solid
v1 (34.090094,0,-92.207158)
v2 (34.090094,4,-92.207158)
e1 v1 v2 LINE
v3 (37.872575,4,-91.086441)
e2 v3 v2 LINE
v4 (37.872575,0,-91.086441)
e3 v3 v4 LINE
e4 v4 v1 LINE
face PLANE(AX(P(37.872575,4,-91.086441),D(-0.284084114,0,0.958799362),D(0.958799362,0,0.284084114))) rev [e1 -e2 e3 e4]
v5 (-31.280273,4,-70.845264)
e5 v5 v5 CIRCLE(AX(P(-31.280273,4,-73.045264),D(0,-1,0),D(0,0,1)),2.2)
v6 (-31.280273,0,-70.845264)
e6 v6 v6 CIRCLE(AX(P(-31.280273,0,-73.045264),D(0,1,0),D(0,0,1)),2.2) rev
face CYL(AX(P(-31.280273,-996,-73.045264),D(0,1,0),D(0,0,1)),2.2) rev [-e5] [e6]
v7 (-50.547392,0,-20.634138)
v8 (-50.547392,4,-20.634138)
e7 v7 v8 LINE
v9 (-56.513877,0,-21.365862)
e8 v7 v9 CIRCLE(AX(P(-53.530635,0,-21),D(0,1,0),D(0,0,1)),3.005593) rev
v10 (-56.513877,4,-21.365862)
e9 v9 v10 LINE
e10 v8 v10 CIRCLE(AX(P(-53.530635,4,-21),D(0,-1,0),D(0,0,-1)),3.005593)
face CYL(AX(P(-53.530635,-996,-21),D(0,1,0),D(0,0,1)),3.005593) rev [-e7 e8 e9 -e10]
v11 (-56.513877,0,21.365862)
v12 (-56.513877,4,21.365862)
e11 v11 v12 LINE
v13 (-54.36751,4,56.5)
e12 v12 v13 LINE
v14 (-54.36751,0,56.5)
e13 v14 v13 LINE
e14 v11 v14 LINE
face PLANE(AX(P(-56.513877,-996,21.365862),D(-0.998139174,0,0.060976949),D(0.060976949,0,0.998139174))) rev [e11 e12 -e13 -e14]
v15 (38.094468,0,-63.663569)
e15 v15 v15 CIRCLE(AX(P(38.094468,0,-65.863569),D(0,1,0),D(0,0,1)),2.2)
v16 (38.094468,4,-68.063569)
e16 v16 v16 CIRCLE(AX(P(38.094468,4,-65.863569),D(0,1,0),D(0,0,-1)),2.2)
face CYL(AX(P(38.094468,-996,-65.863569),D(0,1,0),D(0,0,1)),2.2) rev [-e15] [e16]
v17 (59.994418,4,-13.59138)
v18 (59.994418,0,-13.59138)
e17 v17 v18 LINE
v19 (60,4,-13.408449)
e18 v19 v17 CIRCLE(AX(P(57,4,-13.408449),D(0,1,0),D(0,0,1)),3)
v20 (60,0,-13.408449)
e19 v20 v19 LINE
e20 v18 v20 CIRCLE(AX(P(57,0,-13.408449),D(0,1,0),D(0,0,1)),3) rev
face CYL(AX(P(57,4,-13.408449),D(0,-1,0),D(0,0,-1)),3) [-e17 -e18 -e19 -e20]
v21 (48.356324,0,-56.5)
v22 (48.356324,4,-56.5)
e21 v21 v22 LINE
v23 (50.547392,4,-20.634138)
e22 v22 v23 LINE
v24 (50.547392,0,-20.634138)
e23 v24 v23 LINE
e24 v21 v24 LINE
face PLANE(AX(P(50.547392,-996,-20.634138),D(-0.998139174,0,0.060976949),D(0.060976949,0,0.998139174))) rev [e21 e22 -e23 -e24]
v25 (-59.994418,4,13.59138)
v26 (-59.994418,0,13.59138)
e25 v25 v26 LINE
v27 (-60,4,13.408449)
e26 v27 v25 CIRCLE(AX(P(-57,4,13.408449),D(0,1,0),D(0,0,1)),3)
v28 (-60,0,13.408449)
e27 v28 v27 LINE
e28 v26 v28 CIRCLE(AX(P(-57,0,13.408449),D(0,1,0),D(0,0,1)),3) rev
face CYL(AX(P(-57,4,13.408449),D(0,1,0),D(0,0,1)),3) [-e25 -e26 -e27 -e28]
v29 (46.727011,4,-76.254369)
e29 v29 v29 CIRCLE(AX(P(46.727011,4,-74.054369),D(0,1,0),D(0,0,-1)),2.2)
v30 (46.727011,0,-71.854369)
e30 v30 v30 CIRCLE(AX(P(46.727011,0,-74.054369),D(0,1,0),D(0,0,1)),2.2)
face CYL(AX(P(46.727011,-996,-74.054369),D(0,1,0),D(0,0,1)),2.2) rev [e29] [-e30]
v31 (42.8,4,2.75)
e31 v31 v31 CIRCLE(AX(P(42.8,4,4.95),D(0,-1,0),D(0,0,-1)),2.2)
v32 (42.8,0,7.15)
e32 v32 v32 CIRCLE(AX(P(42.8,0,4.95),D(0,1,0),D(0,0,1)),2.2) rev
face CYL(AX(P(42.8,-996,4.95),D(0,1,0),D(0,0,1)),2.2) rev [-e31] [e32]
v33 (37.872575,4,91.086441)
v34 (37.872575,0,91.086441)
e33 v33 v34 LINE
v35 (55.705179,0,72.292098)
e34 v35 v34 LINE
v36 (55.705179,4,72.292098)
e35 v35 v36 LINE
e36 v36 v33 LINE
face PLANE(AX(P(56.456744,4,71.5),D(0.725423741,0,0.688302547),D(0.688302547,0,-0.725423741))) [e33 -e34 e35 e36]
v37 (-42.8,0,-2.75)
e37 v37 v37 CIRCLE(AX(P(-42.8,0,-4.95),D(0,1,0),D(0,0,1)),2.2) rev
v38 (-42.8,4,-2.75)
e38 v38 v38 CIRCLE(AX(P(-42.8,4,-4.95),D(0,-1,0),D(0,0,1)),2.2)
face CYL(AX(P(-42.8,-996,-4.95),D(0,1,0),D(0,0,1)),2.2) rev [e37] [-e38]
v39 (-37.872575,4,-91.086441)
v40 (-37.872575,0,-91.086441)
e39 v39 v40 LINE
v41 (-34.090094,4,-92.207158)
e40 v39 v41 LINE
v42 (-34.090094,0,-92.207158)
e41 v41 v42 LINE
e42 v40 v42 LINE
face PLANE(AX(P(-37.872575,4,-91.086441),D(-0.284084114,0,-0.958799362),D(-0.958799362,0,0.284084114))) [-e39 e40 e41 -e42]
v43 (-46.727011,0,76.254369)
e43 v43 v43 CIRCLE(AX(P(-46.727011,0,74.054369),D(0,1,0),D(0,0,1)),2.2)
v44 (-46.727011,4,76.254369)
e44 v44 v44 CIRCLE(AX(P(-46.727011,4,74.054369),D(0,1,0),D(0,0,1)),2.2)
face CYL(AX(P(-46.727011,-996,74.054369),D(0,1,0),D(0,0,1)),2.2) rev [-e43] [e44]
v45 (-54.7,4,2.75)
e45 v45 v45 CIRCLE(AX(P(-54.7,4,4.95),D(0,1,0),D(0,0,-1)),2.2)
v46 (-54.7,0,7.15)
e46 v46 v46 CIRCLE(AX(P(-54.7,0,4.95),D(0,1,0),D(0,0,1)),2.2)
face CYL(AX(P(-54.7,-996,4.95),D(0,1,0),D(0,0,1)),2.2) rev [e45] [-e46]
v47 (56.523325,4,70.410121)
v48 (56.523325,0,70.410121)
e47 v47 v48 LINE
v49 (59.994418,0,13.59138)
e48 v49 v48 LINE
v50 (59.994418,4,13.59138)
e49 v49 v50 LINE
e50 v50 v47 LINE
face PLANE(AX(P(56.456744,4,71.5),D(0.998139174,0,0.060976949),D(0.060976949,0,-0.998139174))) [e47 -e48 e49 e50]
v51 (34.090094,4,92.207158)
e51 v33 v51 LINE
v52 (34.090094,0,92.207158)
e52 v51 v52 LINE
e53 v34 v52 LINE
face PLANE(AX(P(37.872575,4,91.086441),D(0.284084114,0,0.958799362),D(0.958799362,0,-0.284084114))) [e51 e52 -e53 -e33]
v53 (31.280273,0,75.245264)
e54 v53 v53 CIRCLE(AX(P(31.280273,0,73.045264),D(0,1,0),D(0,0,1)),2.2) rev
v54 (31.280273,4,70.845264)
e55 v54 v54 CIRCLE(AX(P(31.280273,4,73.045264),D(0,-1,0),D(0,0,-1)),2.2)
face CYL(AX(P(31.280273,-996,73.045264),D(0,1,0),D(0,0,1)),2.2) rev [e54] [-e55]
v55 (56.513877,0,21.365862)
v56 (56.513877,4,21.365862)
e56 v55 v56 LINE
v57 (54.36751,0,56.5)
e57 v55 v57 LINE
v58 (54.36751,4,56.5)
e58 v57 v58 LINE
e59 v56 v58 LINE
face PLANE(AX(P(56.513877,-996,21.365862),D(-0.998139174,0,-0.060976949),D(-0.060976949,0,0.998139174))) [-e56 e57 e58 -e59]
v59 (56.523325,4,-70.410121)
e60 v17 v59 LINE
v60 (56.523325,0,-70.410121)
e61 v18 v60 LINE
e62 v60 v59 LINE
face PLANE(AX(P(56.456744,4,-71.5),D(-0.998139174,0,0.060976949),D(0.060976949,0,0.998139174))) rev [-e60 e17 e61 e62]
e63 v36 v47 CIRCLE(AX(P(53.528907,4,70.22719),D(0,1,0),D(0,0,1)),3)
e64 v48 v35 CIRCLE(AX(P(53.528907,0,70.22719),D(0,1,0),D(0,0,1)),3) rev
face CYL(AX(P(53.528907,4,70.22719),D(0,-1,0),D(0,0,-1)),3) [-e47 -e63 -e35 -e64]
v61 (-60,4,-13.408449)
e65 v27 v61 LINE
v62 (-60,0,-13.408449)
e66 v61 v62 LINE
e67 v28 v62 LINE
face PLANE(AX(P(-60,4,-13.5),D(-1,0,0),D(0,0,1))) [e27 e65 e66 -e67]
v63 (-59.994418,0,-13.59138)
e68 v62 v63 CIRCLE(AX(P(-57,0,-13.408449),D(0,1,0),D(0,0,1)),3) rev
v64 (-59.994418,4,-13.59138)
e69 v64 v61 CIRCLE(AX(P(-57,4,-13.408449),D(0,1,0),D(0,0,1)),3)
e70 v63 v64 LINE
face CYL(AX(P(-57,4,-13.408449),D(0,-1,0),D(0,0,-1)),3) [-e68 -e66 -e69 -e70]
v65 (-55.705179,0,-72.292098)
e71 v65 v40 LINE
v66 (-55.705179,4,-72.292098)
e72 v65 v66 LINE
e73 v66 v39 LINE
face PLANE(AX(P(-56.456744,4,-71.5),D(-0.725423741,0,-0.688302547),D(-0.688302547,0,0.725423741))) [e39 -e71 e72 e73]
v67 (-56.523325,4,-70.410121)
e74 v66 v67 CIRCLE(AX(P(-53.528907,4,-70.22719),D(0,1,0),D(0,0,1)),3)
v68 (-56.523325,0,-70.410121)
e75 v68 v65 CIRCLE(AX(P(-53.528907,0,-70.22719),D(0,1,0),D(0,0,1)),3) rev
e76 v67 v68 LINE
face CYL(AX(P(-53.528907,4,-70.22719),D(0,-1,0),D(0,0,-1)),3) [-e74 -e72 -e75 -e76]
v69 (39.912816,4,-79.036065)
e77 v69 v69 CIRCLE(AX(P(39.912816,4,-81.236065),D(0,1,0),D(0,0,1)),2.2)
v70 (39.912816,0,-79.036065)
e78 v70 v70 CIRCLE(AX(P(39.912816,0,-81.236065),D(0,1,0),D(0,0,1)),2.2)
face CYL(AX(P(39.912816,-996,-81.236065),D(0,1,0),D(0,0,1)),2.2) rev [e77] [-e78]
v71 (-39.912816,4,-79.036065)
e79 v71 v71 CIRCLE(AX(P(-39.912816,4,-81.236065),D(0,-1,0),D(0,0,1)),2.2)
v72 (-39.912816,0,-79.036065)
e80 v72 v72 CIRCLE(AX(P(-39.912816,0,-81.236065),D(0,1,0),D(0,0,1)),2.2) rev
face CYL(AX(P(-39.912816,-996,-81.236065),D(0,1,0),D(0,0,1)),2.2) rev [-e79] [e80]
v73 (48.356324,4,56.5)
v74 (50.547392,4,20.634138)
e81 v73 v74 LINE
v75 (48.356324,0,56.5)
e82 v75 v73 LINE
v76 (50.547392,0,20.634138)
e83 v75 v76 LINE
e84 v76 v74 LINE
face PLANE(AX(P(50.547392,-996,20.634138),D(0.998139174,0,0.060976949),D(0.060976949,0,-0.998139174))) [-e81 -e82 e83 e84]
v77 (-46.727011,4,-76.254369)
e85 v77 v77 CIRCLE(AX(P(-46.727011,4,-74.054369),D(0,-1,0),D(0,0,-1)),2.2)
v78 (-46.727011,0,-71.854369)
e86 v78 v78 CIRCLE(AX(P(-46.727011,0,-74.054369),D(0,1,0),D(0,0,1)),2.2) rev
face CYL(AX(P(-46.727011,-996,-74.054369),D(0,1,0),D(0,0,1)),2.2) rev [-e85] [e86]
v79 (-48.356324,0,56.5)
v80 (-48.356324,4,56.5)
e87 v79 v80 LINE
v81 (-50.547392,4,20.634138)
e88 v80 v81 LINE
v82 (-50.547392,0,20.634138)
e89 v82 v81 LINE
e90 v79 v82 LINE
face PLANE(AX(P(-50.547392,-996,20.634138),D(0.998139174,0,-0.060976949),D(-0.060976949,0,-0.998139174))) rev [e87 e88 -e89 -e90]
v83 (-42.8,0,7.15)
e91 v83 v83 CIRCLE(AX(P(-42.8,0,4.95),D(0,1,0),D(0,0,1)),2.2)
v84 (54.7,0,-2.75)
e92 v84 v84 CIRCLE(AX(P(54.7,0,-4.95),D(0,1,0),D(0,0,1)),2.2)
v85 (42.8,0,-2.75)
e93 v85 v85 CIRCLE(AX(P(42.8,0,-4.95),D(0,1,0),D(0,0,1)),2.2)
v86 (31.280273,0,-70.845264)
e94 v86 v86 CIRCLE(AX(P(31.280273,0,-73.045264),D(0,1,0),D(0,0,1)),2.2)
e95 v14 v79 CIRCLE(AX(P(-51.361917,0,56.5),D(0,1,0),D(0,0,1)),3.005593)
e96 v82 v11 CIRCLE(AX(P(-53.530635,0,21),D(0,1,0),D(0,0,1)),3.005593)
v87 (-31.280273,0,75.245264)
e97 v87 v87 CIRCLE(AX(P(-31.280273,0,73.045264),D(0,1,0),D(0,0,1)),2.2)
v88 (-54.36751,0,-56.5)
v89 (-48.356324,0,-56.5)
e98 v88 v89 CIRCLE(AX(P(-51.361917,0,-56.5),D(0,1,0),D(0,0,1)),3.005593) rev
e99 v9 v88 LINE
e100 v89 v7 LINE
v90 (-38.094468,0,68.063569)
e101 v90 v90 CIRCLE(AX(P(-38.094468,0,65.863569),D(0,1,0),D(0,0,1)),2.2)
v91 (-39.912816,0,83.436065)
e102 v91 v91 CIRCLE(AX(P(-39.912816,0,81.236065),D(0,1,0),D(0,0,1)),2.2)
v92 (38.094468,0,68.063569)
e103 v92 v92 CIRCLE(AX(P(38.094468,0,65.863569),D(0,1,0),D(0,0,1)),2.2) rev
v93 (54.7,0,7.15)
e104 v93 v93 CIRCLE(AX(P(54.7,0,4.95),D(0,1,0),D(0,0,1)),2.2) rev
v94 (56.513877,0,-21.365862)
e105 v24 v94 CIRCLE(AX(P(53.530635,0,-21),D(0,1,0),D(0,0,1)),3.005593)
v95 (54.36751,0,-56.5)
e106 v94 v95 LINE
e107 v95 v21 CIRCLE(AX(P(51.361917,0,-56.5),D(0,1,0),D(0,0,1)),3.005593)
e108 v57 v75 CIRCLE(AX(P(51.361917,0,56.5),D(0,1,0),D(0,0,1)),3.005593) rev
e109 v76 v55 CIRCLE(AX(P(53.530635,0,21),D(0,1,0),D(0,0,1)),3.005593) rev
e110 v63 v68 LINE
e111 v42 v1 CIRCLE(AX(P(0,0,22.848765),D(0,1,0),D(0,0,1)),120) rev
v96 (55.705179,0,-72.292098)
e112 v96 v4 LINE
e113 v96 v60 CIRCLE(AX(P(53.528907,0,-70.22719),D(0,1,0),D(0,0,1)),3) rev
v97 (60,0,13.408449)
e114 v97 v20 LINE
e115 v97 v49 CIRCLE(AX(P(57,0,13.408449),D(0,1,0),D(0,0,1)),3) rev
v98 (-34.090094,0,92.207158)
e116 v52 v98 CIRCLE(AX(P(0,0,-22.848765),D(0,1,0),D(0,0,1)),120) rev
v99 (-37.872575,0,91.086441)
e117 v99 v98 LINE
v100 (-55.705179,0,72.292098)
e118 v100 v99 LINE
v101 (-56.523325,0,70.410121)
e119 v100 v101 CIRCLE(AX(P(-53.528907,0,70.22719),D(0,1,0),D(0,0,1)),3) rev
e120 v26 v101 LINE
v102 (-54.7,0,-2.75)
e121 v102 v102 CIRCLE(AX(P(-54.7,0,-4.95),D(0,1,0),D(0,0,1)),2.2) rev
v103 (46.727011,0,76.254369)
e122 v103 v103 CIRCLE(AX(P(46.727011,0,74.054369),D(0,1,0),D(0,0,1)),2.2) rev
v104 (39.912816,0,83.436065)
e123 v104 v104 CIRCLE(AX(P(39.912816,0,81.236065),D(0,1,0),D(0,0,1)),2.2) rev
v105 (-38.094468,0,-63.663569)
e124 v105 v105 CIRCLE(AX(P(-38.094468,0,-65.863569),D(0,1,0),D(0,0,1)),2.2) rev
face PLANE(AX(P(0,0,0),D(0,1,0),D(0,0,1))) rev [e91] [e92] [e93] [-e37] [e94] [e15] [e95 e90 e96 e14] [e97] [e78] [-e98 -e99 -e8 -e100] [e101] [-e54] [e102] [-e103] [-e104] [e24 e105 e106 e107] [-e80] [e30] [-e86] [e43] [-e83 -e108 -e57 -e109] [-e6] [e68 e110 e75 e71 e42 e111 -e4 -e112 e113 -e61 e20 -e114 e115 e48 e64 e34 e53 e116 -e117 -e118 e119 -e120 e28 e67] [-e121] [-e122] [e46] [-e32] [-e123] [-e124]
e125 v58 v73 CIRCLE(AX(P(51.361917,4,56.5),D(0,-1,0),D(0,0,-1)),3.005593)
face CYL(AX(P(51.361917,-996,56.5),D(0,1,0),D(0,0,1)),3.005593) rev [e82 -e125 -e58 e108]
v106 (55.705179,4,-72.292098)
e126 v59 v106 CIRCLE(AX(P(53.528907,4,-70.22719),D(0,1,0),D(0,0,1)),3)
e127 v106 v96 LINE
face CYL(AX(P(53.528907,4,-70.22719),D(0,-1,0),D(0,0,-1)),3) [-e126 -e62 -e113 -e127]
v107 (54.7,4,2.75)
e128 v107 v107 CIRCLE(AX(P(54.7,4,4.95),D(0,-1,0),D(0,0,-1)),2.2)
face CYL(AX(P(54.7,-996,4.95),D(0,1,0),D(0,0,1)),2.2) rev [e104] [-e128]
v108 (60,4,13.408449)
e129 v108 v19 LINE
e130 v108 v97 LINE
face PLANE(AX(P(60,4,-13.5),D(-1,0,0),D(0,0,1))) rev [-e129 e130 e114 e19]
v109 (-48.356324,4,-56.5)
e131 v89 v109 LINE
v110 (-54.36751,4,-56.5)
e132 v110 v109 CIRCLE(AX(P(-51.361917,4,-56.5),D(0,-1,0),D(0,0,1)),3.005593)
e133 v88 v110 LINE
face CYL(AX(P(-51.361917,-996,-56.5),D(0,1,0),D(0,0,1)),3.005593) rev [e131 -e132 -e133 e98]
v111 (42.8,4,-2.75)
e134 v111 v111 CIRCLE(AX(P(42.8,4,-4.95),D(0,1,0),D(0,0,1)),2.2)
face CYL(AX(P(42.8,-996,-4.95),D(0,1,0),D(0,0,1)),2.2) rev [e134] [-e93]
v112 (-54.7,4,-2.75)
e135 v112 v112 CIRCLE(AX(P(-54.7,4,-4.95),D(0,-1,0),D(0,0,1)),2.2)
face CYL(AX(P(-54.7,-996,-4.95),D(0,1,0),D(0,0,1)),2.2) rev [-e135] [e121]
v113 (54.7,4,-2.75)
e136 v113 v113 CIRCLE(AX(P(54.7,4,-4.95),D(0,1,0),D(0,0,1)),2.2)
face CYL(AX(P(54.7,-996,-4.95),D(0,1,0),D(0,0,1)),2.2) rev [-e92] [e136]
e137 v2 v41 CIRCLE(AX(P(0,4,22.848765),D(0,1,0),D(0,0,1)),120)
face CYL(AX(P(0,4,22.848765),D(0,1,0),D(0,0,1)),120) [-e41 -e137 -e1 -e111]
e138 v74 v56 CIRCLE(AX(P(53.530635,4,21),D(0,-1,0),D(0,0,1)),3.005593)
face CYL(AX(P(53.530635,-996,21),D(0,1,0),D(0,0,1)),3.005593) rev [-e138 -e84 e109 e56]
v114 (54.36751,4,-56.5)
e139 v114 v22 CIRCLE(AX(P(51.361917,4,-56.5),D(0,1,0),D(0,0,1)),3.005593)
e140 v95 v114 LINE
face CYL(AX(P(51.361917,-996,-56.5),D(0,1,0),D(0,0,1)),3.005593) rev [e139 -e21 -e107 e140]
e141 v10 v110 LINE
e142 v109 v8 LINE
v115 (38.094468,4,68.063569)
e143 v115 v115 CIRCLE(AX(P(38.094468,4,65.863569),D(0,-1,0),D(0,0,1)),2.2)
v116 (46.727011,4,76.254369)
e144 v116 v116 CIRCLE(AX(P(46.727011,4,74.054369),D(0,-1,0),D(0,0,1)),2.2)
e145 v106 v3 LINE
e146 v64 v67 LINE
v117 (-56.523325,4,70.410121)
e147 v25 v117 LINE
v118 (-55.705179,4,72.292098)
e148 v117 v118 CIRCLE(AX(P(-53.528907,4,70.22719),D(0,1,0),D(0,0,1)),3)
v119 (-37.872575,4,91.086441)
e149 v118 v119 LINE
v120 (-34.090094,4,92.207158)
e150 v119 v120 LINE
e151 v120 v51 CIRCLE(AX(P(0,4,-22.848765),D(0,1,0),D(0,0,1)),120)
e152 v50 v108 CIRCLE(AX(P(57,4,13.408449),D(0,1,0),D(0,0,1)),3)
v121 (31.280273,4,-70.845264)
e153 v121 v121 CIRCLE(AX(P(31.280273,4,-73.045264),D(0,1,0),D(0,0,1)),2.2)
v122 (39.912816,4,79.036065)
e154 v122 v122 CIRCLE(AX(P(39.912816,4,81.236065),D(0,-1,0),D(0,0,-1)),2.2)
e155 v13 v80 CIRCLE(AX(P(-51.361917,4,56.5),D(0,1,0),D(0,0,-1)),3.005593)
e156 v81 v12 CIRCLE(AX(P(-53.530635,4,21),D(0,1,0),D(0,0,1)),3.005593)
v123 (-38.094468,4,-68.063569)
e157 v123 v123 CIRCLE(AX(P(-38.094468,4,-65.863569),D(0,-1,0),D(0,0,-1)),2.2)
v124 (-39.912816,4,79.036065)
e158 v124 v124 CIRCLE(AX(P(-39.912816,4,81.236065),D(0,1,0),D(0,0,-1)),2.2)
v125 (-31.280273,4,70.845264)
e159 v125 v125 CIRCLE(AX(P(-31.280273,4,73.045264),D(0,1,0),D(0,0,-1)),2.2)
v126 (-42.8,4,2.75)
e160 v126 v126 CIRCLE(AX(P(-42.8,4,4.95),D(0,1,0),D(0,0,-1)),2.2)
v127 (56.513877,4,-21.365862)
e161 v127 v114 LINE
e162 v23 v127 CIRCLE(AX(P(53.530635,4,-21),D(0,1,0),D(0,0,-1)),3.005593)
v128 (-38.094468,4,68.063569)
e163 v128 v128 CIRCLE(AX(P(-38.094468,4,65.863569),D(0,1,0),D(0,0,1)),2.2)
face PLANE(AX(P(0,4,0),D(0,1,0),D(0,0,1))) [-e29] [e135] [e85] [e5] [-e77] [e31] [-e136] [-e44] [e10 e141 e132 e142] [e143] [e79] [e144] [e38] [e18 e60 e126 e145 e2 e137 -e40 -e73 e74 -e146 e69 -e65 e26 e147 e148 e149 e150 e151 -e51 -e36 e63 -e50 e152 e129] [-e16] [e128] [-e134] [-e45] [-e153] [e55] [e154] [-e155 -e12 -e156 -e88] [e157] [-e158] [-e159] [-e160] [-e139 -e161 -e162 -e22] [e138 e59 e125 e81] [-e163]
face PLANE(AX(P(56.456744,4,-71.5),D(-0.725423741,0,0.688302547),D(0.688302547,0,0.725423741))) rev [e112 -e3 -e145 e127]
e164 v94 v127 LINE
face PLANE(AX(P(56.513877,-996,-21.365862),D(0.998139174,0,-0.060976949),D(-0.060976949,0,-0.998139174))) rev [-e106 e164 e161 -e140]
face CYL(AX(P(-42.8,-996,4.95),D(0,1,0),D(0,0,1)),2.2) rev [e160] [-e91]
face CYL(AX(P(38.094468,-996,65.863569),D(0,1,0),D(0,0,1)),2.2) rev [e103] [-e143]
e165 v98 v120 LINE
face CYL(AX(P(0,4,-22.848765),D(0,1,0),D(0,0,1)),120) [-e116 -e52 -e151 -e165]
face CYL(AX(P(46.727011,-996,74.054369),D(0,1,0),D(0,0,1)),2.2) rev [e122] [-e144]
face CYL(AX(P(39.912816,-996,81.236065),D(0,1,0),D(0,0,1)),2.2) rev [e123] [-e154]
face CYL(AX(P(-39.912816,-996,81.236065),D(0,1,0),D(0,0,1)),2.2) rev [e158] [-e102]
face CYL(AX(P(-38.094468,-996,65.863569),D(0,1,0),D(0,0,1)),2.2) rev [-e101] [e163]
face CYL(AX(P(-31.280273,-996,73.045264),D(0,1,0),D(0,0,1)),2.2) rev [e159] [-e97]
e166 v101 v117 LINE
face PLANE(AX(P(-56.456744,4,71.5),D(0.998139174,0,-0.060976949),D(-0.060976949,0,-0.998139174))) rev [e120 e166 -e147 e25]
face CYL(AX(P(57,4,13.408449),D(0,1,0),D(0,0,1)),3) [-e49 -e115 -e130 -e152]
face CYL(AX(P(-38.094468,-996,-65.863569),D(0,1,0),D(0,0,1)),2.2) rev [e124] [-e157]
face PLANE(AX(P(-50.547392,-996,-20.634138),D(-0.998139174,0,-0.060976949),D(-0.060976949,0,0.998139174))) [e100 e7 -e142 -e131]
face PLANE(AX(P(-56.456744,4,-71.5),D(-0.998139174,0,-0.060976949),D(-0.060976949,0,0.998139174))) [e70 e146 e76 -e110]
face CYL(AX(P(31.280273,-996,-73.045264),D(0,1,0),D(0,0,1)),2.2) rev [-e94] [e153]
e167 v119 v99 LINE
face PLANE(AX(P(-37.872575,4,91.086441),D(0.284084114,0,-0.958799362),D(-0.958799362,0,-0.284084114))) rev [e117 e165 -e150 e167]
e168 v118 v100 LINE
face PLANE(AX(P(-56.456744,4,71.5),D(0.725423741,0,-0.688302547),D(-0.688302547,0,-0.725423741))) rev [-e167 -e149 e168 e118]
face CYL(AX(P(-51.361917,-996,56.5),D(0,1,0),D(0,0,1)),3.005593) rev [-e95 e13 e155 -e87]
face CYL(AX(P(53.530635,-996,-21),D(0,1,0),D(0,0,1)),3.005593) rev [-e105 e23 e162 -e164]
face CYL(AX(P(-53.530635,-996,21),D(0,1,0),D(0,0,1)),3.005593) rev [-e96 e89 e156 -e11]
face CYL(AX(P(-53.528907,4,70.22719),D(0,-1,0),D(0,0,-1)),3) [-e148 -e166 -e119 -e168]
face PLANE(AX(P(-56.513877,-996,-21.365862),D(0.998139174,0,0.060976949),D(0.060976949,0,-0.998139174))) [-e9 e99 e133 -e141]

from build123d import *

# Parameters (mm, degrees)
BOSS_EXTRUDE1_DEPTH = 4
SKETCH2_R           = 2.2
CUT_EXTRUDE1_DEPTH  = 1000
FILLET1_R           = 3
MIRROR2_OUTLINE_R   = 2.2
MIRROR2_DEPTH       = 4
FILLET4_R           = 120


# Read off the part's stored shape, not the designer's step: Mirror2
with BuildPart() as part:
    # Sketch1 → Boss-Extrude1 (new body)
    with BuildSketch(Plane(origin=(0, 0, 0), x_dir=(1, 0, 0), z_dir=(0, 1, 0))):
        Polygon((0, 0), (60, 0), (60, 13.5), (56.456743563, 71.5), (37.872574787, 91.086440997), (0, 102.307763512), align=None)
    extrude(amount=BOSS_EXTRUDE1_DEPTH)

    # Sketch2 → Cut-Extrude1 (cut)
    with BuildSketch(Plane(origin=(0, 4, 0), x_dir=(1, 0, 0), z_dir=(0, 1, 0))):
        with Locations(Location((39.912815741, 81.236064514, 0), (0, 0, 270))):
            Circle(SKETCH2_R)
        with Locations(Location((54.7, 4.95, 0), (0, 0, 270))):
            Circle(SKETCH2_R)
        with Locations(Location((31.280273227, 73.045264202, 0), (0, 0, 270))):
            Circle(SKETCH2_R)
        with Locations(Location((42.8, 4.95, 0), (0, 0, 270))):
            Circle(SKETCH2_R)
        with Locations(Location((38.094468445, 65.86356917, 0), (0, 0, 270))):
            Circle(SKETCH2_R)
        with Locations(Location((46.727010958, 74.054369482, 0), (0, 0, 270))):
            Circle(SKETCH2_R)
        with BuildLine():
            Line((56.513876684, 21.365861695), (54.367510102, 56.5))
            ThreePointArc((54.367510102, 56.5), (51.361917218, 59.505592884), (48.356324334, 56.5))
            Line((48.356324334, 56.5), (50.547392357, 20.634138305))
            ThreePointArc((50.547392357, 20.634138305), (53.896496216, 18.016757837), (56.513876684, 21.365861695))
        make_face()
    extrude(amount=-CUT_EXTRUDE1_DEPTH, mode=Mode.SUBTRACT)

    # Fillet1
    # the kernel refuses this fillet: 3 mm, written as the material it takes off along each edge
    with BuildSketch(Plane(origin=(56.456743563, -2.729776757, -71.5), x_dir=(0.060976949232979236, 0, 0.99813917449534), z_dir=(0, 1, 0))) as fillet1_piece_1:
        with BuildLine():
            CenterArc((FILLET1_R * 0.363970234266, -FILLET1_R), FILLET1_R, 90, 40)
            Line((-FILLET1_R * 0.27881737542, -FILLET1_R * 0.233955556881), (0, 0))
            Line((0, 0), (FILLET1_R * 0.363970234266, 0))
        make_face()
    extrude(amount=9.459553514, mode=Mode.SUBTRACT)
    with BuildSketch(Plane(origin=(60, -0.228876509, -13.5), x_dir=(0, 0, 1), z_dir=(0, 1, 0))) as fillet1_piece_2:
        with BuildLine():
            CenterArc((FILLET1_R * 0.0305168678995, -FILLET1_R), FILLET1_R, 90, 3.495890522)
            Line((-FILLET1_R * 0.0304600813334, -FILLET1_R * 0.00186082550466), (0, 0))
            Line((0, 0), (FILLET1_R * 0.0305168678995, 0))
        make_face()
    extrude(amount=4.457753018, mode=Mode.SUBTRACT)

    # Mirror2 outline → Mirror2 (add)
    with BuildSketch(Plane(origin=(0, 0, 0), x_dir=(1, 0, 0), z_dir=(0, 1, 0))):
        with BuildLine():
            Line((60, -13.408449396), (60, 0))
            Line((60, 0), (0, 0))
            Line((0, 0), (0, 102.307763512))
            Line((0, 102.307763512), (-37.872574787, 91.086440997))
            Line((-37.872574787, 91.086440997), (-55.705178644, 72.292097946))
            ThreePointArc((-55.705178644, 72.292097946), (-56.280173438, 71.423240183), (-56.523324946, 70.410121152))
            Line((-56.523324946, 70.410121152), (-59.994417523, 13.591380244))
            ThreePointArc((-59.994417523, 13.591380244), (-59.998604056, 13.4999574), (-60, 13.408449396))
            Line((-60, 13.408449396), (-60, -13.408449396))
            ThreePointArc((-60, -13.408449396), (-59.998604056, -13.4999574), (-59.994417523, -13.591380244))
            Line((-59.994417523, -13.591380244), (-56.523324946, -70.410121152))
            ThreePointArc((-56.523324946, -70.410121152), (-56.280173438, -71.423240183), (-55.705178644, -72.292097946))
            Line((-55.705178644, -72.292097946), (-37.872574787, -91.086440997))
            Line((-37.872574787, -91.086440997), (0, -102.307763512))
            Line((0, -102.307763512), (37.872574787, -91.086440997))
            Line((37.872574787, -91.086440997), (55.705178644, -72.292097946))
            ThreePointArc((55.705178644, -72.292097946), (56.280173438, -71.423240183), (56.523324946, -70.410121152))
            Line((56.523324946, -70.410121152), (59.994417523, -13.591380244))
            ThreePointArc((59.994417523, -13.591380244), (59.998604056, -13.4999574), (60, -13.408449396))
        make_face()
        with Locations((-39.912815741, -81.236064514)):
            Circle(MIRROR2_OUTLINE_R, mode=Mode.SUBTRACT)
        with Locations((-46.727010958, -74.054369482)):
            Circle(MIRROR2_OUTLINE_R, mode=Mode.SUBTRACT)
        with Locations((-38.094468445, -65.86356917)):
            Circle(MIRROR2_OUTLINE_R, mode=Mode.SUBTRACT)
        with Locations((-31.280273227, -73.045264202)):
            Circle(MIRROR2_OUTLINE_R, mode=Mode.SUBTRACT)
        with BuildLine():
            ThreePointArc((-48.356324334, -56.5), (-51.361917218, -59.505592884), (-54.367510102, -56.5))
            Line((-54.367510102, -56.5), (-56.513876684, -21.365861695))
            ThreePointArc((-56.513876684, -21.365861695), (-53.896496215, -18.016757837), (-50.547392357, -20.634138305))
            Line((-50.547392357, -20.634138305), (-48.356324334, -56.5))
        make_face(mode=Mode.SUBTRACT)
        with Locations((-54.7, -4.95)):
            Circle(MIRROR2_OUTLINE_R, mode=Mode.SUBTRACT)
        with Locations((-42.8, -4.95)):
            Circle(MIRROR2_OUTLINE_R, mode=Mode.SUBTRACT)
        with Locations((39.912815741, -81.236064514)):
            Circle(MIRROR2_OUTLINE_R, mode=Mode.SUBTRACT)
        with Locations((31.280273227, -73.045264202)):
            Circle(MIRROR2_OUTLINE_R, mode=Mode.SUBTRACT)
        with Locations((38.094468445, -65.86356917)):
            Circle(MIRROR2_OUTLINE_R, mode=Mode.SUBTRACT)
        with Locations((46.727010958, -74.054369482)):
            Circle(MIRROR2_OUTLINE_R, mode=Mode.SUBTRACT)
        with BuildLine():
            ThreePointArc((54.367510102, -56.5), (51.361917218, -59.505592884), (48.356324334, -56.5))
            Line((48.356324334, -56.5), (50.547392357, -20.634138305))
            ThreePointArc((50.547392357, -20.634138305), (53.896496215, -18.016757837), (56.513876684, -21.365861695))
            Line((56.513876684, -21.365861695), (54.367510102, -56.5))
        make_face(mode=Mode.SUBTRACT)
        with Locations((42.8, -4.95)):
            Circle(MIRROR2_OUTLINE_R, mode=Mode.SUBTRACT)
        with Locations((54.7, -4.95)):
            Circle(MIRROR2_OUTLINE_R, mode=Mode.SUBTRACT)
        with Locations((-54.7, 4.95)):
            Circle(MIRROR2_OUTLINE_R, mode=Mode.SUBTRACT)
        with Locations((-42.8, 4.95)):
            Circle(MIRROR2_OUTLINE_R, mode=Mode.SUBTRACT)
        with BuildLine():
            ThreePointArc((-54.367510102, 56.5), (-51.361917218, 59.505592884), (-48.356324334, 56.5))
            Line((-48.356324334, 56.5), (-50.547392357, 20.634138305))
            ThreePointArc((-50.547392357, 20.634138305), (-53.896496215, 18.016757837), (-56.513876684, 21.365861695))
            Line((-56.513876684, 21.365861695), (-54.367510102, 56.5))
        make_face(mode=Mode.SUBTRACT)
        with Locations((-46.727010958, 74.054369482)):
            Circle(MIRROR2_OUTLINE_R, mode=Mode.SUBTRACT)
        with Locations((-38.094468445, 65.86356917)):
            Circle(MIRROR2_OUTLINE_R, mode=Mode.SUBTRACT)
        with Locations((-31.280273227, 73.045264202)):
            Circle(MIRROR2_OUTLINE_R, mode=Mode.SUBTRACT)
        with Locations((-39.912815741, 81.236064514)):
            Circle(MIRROR2_OUTLINE_R, mode=Mode.SUBTRACT)
    extrude(amount=MIRROR2_DEPTH)

    # Fillet4
    fillet4_edges = [part.edges().sort_by_distance(p)[0] for p in [
        (0, 2, 102.307763512),
        (0, 2, -102.307763512),
    ]]
    fillet(fillet4_edges, radius=FILLET4_R)


solid = part.part
